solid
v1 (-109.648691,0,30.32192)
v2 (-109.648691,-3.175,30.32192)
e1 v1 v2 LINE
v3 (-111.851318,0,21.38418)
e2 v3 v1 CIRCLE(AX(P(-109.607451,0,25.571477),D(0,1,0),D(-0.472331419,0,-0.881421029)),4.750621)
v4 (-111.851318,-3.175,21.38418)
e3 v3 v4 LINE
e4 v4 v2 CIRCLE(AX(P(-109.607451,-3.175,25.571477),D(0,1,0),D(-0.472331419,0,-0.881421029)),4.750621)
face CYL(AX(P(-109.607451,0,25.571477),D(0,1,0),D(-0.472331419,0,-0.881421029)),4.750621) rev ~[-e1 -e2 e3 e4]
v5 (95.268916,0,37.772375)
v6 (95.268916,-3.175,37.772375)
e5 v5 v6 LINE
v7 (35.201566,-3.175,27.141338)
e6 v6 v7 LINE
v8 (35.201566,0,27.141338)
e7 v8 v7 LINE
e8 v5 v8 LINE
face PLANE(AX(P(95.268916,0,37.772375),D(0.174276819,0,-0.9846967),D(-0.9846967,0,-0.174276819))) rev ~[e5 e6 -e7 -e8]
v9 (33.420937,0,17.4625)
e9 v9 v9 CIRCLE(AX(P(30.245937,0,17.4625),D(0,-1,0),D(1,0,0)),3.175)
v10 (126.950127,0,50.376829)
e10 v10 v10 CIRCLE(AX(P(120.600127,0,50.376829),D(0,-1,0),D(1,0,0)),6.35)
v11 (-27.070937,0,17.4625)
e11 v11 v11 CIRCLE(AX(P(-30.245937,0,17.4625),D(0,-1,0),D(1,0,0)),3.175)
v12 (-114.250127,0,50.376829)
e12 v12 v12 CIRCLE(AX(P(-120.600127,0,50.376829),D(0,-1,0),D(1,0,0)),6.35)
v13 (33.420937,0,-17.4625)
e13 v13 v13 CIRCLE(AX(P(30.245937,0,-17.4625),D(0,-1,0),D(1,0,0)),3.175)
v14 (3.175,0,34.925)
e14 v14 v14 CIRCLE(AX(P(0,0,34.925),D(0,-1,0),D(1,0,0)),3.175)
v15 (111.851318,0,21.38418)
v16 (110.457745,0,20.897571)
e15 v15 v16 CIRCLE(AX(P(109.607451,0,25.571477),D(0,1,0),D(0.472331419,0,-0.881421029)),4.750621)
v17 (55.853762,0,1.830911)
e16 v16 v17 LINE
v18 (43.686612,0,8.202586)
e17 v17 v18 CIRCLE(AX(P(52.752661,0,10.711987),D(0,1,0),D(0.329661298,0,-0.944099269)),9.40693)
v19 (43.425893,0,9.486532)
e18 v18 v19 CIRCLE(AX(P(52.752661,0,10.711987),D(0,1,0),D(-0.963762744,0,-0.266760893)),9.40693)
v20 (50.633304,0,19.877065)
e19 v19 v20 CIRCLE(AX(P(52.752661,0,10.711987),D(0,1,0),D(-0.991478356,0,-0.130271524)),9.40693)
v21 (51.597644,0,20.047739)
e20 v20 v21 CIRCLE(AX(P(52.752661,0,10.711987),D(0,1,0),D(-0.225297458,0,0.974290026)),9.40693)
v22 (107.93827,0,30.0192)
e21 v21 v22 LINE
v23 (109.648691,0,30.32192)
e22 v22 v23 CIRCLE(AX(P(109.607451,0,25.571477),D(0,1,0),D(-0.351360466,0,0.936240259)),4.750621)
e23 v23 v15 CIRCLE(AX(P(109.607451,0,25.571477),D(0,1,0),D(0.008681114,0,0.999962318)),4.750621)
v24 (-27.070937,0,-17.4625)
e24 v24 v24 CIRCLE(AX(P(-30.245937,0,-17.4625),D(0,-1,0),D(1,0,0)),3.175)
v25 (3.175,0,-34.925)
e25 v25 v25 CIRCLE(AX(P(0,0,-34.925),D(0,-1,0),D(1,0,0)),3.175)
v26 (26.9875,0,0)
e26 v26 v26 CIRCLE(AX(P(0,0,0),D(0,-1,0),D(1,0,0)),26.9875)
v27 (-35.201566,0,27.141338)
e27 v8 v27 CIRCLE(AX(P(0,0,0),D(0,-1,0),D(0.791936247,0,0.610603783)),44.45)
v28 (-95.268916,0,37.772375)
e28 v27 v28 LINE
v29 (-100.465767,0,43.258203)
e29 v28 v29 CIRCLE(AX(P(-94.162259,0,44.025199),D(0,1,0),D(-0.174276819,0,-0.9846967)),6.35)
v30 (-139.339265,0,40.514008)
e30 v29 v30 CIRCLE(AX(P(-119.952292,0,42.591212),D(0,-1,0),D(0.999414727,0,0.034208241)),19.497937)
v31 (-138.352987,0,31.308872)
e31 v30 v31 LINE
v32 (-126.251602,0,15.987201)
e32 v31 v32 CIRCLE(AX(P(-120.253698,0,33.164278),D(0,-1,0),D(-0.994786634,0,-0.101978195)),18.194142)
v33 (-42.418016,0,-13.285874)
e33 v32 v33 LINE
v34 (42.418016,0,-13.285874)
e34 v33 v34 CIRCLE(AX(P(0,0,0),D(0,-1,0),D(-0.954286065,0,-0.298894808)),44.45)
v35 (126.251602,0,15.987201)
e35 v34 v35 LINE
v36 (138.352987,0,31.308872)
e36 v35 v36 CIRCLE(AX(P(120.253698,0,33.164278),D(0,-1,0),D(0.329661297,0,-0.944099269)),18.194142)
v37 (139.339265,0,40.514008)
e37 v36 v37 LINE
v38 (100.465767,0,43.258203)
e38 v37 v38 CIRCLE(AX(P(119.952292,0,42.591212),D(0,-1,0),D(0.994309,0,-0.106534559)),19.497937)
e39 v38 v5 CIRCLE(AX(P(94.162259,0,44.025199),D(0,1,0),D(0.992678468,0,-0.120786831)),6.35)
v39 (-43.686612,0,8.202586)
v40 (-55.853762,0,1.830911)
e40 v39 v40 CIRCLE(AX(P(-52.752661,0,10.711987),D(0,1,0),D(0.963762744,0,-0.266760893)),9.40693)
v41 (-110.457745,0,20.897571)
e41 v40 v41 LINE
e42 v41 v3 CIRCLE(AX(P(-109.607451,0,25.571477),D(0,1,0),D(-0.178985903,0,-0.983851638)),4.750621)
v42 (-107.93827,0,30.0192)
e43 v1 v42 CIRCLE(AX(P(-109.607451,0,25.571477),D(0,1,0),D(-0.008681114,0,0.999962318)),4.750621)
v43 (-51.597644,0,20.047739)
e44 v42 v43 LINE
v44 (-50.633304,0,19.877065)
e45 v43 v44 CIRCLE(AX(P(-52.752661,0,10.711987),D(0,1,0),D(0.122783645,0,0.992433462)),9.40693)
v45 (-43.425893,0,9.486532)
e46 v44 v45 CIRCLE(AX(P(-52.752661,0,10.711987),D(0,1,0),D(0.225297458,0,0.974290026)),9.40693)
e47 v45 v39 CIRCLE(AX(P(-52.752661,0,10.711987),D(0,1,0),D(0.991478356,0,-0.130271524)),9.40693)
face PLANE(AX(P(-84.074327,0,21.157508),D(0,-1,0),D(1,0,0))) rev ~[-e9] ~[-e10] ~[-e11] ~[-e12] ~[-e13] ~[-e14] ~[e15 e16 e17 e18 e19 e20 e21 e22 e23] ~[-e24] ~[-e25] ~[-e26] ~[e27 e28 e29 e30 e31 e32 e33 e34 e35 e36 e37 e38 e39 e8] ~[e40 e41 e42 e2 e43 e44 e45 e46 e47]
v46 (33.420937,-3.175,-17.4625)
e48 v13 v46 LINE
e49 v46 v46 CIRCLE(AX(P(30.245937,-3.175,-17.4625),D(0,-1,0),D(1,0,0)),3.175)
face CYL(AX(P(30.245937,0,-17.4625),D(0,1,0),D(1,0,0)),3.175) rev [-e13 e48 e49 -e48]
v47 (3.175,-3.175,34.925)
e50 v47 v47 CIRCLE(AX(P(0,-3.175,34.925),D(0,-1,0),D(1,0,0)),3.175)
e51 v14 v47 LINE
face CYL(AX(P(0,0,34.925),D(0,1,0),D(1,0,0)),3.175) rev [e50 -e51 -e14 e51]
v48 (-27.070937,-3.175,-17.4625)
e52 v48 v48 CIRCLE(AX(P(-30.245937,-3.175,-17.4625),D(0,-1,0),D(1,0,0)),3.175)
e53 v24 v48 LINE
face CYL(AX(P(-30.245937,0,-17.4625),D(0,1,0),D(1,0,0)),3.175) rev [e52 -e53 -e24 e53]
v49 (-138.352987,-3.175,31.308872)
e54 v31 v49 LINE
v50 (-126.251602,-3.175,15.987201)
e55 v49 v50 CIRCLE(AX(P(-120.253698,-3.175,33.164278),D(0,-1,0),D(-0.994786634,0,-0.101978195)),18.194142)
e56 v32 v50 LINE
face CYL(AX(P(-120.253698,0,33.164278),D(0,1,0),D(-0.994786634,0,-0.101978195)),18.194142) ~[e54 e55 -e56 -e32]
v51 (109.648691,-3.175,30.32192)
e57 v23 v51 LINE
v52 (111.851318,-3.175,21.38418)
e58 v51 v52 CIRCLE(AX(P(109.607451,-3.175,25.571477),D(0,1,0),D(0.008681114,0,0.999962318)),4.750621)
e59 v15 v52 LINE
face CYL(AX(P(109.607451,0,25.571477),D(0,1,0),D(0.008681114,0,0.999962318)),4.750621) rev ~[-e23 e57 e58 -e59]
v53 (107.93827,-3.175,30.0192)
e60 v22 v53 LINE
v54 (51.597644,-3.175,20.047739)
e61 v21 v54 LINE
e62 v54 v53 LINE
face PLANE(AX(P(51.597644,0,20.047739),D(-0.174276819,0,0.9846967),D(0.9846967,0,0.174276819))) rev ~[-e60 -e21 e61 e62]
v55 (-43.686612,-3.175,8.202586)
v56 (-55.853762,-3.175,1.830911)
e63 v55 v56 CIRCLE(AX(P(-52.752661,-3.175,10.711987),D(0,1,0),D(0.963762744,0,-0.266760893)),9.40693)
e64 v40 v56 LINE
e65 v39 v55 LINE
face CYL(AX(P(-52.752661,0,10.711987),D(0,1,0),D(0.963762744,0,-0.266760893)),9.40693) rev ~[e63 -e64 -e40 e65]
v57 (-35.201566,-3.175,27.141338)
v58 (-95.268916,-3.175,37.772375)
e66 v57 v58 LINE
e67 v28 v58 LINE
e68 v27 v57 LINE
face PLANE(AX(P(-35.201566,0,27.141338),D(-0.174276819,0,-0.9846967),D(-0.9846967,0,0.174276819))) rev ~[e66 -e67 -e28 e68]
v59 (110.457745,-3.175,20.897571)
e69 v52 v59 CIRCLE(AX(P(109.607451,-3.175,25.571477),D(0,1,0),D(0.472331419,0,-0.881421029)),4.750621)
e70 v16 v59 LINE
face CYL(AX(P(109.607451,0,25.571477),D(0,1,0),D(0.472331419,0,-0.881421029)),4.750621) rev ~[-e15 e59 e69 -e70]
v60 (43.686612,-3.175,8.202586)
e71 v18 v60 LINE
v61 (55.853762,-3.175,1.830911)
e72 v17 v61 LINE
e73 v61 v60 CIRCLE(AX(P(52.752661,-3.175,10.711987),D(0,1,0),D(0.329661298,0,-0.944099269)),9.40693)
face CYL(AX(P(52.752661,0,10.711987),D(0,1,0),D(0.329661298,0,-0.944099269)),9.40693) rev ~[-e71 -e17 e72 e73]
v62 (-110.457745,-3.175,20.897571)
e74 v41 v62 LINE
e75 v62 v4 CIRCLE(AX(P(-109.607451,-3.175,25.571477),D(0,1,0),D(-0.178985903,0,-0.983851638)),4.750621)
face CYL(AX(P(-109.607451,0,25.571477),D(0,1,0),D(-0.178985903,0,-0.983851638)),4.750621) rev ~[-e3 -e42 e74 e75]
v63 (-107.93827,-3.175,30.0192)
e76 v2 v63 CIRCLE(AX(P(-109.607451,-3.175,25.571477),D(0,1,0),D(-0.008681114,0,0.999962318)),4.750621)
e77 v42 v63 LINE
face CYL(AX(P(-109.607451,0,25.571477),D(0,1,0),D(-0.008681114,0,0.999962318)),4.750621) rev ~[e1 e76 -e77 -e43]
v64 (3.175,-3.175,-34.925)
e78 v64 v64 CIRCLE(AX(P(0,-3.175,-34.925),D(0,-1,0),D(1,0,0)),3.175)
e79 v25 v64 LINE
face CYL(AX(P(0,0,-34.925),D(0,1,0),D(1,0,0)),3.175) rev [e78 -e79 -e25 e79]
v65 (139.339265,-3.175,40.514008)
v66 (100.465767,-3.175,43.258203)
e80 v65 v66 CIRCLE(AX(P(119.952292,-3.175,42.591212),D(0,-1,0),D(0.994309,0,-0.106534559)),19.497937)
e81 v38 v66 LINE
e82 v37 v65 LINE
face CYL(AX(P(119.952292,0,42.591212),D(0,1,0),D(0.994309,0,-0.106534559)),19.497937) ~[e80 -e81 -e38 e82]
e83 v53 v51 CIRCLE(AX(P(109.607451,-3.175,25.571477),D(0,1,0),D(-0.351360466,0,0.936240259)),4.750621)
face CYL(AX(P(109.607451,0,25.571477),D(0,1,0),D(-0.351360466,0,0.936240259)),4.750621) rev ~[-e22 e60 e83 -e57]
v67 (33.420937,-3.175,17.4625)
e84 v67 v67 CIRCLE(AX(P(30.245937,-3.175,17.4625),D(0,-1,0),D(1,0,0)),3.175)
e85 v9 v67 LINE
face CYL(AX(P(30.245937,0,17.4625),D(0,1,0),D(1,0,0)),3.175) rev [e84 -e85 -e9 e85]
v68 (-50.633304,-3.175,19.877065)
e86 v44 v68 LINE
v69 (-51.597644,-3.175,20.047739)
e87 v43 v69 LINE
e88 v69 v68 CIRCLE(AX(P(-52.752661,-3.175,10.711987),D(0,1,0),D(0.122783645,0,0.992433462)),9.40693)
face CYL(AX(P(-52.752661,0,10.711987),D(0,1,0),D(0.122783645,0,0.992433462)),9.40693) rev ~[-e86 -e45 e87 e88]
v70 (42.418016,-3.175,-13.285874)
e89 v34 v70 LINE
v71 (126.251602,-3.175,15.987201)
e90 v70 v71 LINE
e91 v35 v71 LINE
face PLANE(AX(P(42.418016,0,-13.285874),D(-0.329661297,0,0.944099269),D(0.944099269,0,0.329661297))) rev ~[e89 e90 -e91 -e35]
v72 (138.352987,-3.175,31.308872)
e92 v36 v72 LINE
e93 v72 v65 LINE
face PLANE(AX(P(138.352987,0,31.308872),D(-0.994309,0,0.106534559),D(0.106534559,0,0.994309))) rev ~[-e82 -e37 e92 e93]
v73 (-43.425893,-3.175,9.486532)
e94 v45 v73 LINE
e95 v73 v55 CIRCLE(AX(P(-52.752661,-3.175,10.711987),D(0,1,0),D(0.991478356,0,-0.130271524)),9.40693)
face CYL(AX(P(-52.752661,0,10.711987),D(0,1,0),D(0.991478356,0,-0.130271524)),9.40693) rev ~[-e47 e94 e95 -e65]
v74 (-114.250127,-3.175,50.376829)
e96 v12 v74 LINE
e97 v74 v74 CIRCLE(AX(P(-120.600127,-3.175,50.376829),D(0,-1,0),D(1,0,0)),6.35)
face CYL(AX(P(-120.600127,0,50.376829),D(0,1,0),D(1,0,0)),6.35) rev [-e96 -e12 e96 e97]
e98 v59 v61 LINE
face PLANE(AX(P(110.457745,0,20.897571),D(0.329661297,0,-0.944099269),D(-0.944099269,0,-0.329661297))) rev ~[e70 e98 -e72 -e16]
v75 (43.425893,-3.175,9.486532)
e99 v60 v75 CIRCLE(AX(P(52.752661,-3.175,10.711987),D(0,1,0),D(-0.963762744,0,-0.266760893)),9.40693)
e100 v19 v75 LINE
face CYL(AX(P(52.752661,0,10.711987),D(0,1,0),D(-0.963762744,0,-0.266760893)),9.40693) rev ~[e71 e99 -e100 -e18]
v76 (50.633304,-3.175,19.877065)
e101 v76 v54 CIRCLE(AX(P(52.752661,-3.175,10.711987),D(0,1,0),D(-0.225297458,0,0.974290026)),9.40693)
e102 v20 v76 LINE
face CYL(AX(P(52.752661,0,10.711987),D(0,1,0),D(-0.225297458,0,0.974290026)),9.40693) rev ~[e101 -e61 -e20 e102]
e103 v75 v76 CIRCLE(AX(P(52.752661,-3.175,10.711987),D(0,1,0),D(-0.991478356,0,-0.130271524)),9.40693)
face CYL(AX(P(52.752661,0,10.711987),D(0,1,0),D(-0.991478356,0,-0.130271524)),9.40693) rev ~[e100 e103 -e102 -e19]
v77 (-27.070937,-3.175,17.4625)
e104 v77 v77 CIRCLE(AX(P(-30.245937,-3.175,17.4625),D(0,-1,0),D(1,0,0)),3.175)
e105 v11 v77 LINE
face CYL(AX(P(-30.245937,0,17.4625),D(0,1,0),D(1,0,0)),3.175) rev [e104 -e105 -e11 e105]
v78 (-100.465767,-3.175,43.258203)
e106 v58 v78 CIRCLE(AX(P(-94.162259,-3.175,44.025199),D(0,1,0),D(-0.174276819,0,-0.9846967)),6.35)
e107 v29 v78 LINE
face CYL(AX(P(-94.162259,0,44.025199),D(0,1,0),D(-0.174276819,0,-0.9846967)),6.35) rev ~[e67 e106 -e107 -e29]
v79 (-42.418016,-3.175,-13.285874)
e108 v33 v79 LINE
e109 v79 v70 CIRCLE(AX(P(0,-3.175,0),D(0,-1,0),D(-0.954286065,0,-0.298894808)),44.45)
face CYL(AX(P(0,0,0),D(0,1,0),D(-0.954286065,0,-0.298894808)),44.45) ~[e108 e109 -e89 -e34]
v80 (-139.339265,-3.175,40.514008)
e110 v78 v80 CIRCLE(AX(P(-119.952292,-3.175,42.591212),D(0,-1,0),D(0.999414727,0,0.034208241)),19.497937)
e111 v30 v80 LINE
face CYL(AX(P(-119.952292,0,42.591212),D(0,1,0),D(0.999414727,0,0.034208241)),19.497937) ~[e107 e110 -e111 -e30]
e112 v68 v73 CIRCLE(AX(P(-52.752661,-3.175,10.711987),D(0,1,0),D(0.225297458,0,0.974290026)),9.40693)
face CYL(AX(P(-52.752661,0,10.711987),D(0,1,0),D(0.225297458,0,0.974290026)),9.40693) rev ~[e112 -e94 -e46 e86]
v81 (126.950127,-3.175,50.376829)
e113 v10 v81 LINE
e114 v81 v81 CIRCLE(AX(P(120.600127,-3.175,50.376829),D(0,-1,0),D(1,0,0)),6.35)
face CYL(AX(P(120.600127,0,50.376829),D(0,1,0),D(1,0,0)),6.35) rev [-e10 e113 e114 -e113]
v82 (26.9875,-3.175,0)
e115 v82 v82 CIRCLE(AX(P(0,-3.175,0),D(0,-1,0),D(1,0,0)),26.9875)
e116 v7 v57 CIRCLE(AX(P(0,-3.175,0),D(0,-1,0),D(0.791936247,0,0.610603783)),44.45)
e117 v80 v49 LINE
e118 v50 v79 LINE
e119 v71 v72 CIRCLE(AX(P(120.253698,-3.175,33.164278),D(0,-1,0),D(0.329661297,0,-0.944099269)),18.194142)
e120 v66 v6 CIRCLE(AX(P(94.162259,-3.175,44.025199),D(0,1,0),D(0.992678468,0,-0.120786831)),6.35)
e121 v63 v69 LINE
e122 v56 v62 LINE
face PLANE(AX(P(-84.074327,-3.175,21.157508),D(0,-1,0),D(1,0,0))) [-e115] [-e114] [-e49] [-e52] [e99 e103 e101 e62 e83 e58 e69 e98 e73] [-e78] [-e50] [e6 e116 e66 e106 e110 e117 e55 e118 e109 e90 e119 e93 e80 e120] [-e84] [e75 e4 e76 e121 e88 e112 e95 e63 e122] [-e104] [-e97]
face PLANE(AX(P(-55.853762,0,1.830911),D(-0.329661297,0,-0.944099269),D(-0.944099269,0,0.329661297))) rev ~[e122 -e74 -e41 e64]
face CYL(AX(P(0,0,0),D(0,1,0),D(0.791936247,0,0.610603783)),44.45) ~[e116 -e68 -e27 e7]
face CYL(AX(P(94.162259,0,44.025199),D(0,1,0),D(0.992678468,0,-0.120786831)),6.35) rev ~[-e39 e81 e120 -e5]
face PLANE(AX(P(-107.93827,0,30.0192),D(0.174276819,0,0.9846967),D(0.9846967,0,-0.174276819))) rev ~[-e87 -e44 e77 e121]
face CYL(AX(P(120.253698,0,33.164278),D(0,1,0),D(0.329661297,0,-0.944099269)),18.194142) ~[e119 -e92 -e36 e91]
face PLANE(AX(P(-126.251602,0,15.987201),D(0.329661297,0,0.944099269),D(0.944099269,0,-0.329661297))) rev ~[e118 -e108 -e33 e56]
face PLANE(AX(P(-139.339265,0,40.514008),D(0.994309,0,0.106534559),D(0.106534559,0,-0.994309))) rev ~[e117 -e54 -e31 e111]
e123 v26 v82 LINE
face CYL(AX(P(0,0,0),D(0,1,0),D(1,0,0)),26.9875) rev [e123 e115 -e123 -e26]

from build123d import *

# Parameters (mm, degrees)
F0_R     = 6.35
F0_R_2   = 3.175
F0_R_3   = 26.9875
F1_DEPTH = 3.175


# Not quite as in the source:
# - a feature names something its author has since deleted; it is built from what else it names


with BuildPart() as f1:
    # F0 (on Front) → F1 (new body)
    with BuildSketch(Plane.XZ):
        with BuildLine():
            ThreePointArc((-43.4258934254, 9.4865315159), (-40.2925849359, 18.769925391), (-35.2015661866, 27.1413381765))
            Line((-35.2015661866, 27.1413381765), (-95.2689163392, 37.7723748329))
            ThreePointArc((-95.2689163392, 37.7723748329), (-98.7721627257, 39.6581308221), (-100.4657668126, 43.2582025009))
            ThreePointArc((-100.4657668126, 43.2582025009), (-121.3252913638, 62.0407471137), (-139.3392654958, 40.5140083313))
            Line((-139.3392654958, 40.5140083313), (-138.3529874387, 31.3088718833))
            ThreePointArc((-138.3529874387, 31.3088718833), (-134.5315509232, 21.8873221018), (-126.2516022963, 15.9872010809))
            Line((-126.2516022963, 15.9872010809), (-42.4180155898, -13.285874206))
            ThreePointArc((-42.4180155899, -13.285874206), (-44.3727417421, -2.6195973531), (-43.6866122567, 8.2025855396))
            ThreePointArc((-43.6866122567, 8.2025855396), (-48.388636459, 2.3785824935), (-55.8537619567, 1.8309107075))
            Line((-55.8537619567, 1.8309107075), (-110.4577448757, 20.8975708106))
            ThreePointArc((-110.4577448757, 20.8975708106), (-111.1735466188, 21.086419267), (-111.8513183434, 21.3841798493))
            ThreePointArc((-111.8513183434, 21.3841798493), (-114.2200668687, 26.7082159188), (-109.6486913125, 30.321919721))
            ThreePointArc((-109.6486913125, 30.321919721), (-108.7795274506, 30.2493985469), (-107.9382701007, 30.0192003476))
            Line((-107.9382701007, 30.0192003476), (-51.5976439548, 20.0477389749))
            ThreePointArc((-51.5976439548, 20.0477389749), (-51.1132512592, 19.9749597914), (-50.6333036668, 19.8770649411))
            ThreePointArc((-50.6333036668, 19.8770649411), (-45.0232212062, 16.073525101), (-43.4258934254, 9.4865315159))
        make_face()
        with Locations((-120.6001266837, 50.3768287599)):
            Circle(F0_R, mode=Mode.SUBTRACT)
        with BuildLine():
            ThreePointArc((35.2015661866, 27.1413381765), (0, 44.45), (-35.2015661866, 27.1413381765))
            ThreePointArc((-35.2015661866, 27.1413381765), (-40.2925849359, 18.769925391), (-43.4258934254, 9.4865315159))
            ThreePointArc((-43.4258934254, 9.4865315159), (-43.533872992, 8.8400140623), (-43.6866122567, 8.2025855396))
            ThreePointArc((-43.6866122567, 8.2025855396), (-44.3727417421, -2.6195973531), (-42.4180155899, -13.285874206))
            ThreePointArc((-42.4180155899, -13.285874206), (0, -44.45), (42.4180155899, -13.285874206))
            ThreePointArc((42.4180155899, -13.285874206), (43.9390674285, -6.7201825508), (44.45, 0))
            ThreePointArc((44.45, 0), (44.2587415931, 4.1190159741), (43.6866122567, 8.2025855396))
            ThreePointArc((43.6866122567, 8.2025855396), (43.533872992, 8.8400140623), (43.4258934254, 9.4865315159))
            ThreePointArc((43.4258934254, 9.4865315159), (40.2925849359, 18.769925391), (35.2015661866, 27.1413381765))
        make_face()
        with Locations((0, -34.925)):
            Circle(F0_R_2, mode=Mode.SUBTRACT)
        with Locations((-30.2459372272, -17.4625)):
            Circle(F0_R_2, mode=Mode.SUBTRACT)
        Circle(F0_R_3, mode=Mode.SUBTRACT)
        with Locations((30.2459372272, -17.4625)):
            Circle(F0_R_2, mode=Mode.SUBTRACT)
        with Locations((-30.2459372272, 17.4625)):
            Circle(F0_R_2, mode=Mode.SUBTRACT)
        with Locations((0, 34.925)):
            Circle(F0_R_2, mode=Mode.SUBTRACT)
        with Locations((30.2459372272, 17.4625)):
            Circle(F0_R_2, mode=Mode.SUBTRACT)
        with BuildLine():
            Line((95.2689163392, 37.7723748329), (35.2015661866, 27.1413381765))
            ThreePointArc((35.2015661866, 27.1413381765), (40.2925849359, 18.769925391), (43.4258934254, 9.4865315159))
            ThreePointArc((43.4258934254, 9.4865315159), (45.0232212062, 16.073525101), (50.6333036668, 19.8770649411))
            ThreePointArc((50.6333036668, 19.8770649411), (51.1132512592, 19.9749597914), (51.5976439548, 20.0477389749))
            Line((51.5976439548, 20.0477389749), (107.9382701008, 30.0192003476))
            ThreePointArc((107.9382701008, 30.0192003476), (108.7795274506, 30.2493985469), (109.6486913125, 30.321919721))
            ThreePointArc((109.6486913125, 30.321919721), (114.2200668687, 26.7082159188), (111.8513183434, 21.3841798493))
            ThreePointArc((111.8513183434, 21.3841798493), (111.1735466188, 21.086419267), (110.4577448757, 20.8975708106))
            Line((110.4577448757, 20.8975708106), (55.8537619567, 1.8309107075))
            ThreePointArc((55.8537619567, 1.8309107075), (48.388636459, 2.3785824935), (43.6866122567, 8.2025855396))
            ThreePointArc((43.6866122567, 8.2025855396), (44.2587415931, 4.1190159741), (44.45, 0))
            ThreePointArc((44.45, 0), (43.9390674285, -6.7201825508), (42.4180155899, -13.285874206))
            Line((42.4180155898, -13.285874206), (126.2516022963, 15.9872010809))
            ThreePointArc((126.2516022963, 15.9872010809), (134.5315509232, 21.8873221018), (138.3529874387, 31.3088718833))
            Line((138.3529874387, 31.3088718833), (139.3392654958, 40.5140083313))
            ThreePointArc((139.3392654958, 40.5140083313), (121.3252913638, 62.0407471137), (100.4657668126, 43.2582025009))
            ThreePointArc((100.4657668126, 43.2582025009), (98.7721627257, 39.6581308221), (95.2689163392, 37.7723748329))
        make_face()
        with Locations((120.6001266837, 50.3768287599)):
            Circle(F0_R, mode=Mode.SUBTRACT)
    extrude(amount=F1_DEPTH)


solid = f1.part
